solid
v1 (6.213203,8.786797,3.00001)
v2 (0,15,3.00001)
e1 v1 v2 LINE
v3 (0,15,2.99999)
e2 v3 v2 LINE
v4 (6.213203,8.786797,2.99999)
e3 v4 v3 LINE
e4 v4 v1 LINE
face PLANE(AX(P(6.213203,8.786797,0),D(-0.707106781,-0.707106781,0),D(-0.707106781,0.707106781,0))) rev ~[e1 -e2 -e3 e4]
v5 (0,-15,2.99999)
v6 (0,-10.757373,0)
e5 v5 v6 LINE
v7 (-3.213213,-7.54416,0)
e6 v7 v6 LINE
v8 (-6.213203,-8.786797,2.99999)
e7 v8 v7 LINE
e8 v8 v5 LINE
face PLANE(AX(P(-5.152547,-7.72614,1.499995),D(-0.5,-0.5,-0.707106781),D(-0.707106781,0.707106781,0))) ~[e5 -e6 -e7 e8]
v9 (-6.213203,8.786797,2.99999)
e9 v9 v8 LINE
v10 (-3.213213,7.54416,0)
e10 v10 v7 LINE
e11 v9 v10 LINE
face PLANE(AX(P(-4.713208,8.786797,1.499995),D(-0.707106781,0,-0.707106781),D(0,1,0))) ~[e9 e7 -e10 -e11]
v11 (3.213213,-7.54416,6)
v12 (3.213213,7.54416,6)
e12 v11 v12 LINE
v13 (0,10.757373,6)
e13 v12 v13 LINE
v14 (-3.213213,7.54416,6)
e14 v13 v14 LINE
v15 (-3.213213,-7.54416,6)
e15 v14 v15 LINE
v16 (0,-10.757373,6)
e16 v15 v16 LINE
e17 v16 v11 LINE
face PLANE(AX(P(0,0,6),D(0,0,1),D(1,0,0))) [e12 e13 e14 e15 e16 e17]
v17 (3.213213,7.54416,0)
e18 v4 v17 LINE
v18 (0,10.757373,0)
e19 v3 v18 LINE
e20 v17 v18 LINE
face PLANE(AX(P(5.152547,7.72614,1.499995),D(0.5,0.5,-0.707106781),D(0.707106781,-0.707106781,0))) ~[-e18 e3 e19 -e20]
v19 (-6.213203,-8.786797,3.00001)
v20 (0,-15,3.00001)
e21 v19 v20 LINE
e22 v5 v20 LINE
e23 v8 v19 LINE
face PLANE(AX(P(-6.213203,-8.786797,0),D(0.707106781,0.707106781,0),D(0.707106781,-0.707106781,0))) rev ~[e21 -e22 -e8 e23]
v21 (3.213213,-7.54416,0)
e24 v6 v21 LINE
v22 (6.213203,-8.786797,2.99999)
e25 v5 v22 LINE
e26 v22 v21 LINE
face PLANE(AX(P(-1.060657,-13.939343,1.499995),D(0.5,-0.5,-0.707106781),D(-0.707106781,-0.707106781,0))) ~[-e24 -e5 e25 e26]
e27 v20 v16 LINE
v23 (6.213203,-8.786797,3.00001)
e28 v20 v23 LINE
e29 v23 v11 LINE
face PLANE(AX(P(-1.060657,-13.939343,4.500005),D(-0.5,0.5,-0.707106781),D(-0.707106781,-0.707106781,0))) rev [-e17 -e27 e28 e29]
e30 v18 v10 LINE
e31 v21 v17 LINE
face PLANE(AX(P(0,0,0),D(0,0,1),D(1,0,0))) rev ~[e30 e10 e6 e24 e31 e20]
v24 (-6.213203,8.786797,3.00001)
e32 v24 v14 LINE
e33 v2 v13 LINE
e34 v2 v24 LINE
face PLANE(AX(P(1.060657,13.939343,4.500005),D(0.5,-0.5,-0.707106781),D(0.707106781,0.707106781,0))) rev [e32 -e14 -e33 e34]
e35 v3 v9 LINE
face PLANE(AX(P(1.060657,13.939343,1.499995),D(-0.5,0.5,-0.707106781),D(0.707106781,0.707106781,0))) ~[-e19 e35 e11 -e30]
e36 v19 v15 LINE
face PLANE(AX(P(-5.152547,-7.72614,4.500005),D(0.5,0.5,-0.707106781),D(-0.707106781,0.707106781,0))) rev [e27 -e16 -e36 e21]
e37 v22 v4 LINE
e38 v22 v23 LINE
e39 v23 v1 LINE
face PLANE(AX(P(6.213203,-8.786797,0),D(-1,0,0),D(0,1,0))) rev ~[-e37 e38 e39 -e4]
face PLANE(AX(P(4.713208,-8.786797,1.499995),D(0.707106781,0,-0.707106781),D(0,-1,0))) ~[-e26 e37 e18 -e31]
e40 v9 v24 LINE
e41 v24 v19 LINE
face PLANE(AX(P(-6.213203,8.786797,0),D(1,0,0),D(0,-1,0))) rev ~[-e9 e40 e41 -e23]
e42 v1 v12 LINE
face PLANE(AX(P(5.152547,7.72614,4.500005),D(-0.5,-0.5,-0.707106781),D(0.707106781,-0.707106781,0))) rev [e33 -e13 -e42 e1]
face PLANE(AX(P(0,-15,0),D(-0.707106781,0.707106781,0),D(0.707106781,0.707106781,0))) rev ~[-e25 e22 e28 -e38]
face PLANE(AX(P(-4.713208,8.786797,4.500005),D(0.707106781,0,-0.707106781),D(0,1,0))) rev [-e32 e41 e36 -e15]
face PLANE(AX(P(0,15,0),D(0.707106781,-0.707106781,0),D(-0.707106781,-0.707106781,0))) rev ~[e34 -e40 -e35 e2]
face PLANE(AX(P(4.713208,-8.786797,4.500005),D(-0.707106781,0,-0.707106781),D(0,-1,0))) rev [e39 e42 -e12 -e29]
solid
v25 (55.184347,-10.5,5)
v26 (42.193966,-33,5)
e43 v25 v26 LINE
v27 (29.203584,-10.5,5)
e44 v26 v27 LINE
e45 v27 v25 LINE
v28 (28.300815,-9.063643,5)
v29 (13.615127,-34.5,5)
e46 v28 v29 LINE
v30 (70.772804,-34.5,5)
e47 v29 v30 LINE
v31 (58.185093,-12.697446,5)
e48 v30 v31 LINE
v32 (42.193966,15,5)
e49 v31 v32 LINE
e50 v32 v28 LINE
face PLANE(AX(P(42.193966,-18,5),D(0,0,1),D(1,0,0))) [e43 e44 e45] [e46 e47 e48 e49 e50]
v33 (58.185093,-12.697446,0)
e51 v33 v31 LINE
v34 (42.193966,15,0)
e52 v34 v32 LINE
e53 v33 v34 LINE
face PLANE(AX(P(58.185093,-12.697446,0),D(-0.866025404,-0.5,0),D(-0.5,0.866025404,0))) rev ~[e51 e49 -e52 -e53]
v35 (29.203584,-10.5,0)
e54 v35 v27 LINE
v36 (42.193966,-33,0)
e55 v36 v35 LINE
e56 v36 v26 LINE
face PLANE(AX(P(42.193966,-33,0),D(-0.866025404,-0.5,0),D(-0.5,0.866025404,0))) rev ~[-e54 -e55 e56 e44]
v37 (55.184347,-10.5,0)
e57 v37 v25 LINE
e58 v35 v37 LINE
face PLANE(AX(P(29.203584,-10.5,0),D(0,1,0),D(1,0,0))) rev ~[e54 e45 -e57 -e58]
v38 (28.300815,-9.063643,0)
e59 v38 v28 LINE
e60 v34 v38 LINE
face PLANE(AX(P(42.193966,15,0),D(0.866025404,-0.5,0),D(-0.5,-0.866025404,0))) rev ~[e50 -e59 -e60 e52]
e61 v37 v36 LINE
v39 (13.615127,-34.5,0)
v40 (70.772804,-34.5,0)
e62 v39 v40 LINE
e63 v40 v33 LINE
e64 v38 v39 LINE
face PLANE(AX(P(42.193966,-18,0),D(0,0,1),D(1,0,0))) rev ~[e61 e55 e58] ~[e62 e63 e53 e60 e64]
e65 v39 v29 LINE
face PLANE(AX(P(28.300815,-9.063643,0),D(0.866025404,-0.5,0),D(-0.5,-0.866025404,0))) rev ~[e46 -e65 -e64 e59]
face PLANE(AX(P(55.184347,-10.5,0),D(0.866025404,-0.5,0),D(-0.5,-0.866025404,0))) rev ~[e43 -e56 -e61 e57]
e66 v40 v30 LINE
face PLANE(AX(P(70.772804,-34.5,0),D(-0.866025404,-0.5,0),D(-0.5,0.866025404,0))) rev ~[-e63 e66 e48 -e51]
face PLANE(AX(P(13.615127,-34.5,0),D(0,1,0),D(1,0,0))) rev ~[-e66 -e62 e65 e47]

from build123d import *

# Parameters (mm, degrees)
F1_DEPTH = 6
F2_SIZE  = 2.99999
F4_DEPTH = 5


# Not quite as in the source:
# - a fillet or chamfer is up to 0.001 mm smaller than in the source, because OpenCascade refuses the exact size


with BuildPart() as f1:
    # F0 (on Top) → F1 (new body)
    with BuildSketch(Plane.XY):
        Polygon((-6.2132034356, 8.7867965644), (-6.2132034356, 0), (-6.2132034356, -8.7867965644), (0, -15), (6.2132034356, -8.7867965644), (6.2132034356, 0), (6.2132034356, 8.7867965644), (0, 15), align=None)
    extrude(amount=F1_DEPTH)

    # F2 (size 3 in the source; OpenCascade refuses exactly that, so slightly less here)
    f2_edges = [f1.edges().sort_by_distance(p)[0] for p in [
        (-3.106602, 11.893398, 6),
        (3.106602, 11.893398, 6),
        (6.213203, 0, 6),
        (-6.213203, 0, 6),
        (-3.106602, -11.893398, 6),
        (3.106602, -11.893398, 6),
        (-3.106602, 11.893398, 0),
        (-6.213203, 0, 0),
        (-3.106602, -11.893398, 0),
        (3.106602, -11.893398, 0),
        (6.213203, 0, 0),
        (3.106602, 11.893398, 0),
    ]]
    chamfer(f2_edges, length=F2_SIZE)


with BuildPart() as f4:
    # F3 (on Top) → F4 (new body)
    with BuildSketch(Plane.XY):
        Polygon((28.300814713, -9.0636431253), (13.6151272242, -34.5), (28.8406131639, -34.5), (70.772803874, -34.5), (58.1850934371, -12.6974459723), (42.1939655491, 15), align=None)
        Polygon((29.2035844924, -10.5), (42.1939655491, -10.5), (55.1843466059, -10.5), (42.1939655491, -33), align=None, mode=Mode.SUBTRACT)
    extrude(amount=F4_DEPTH)


solid = Compound([f1.part, f4.part])
